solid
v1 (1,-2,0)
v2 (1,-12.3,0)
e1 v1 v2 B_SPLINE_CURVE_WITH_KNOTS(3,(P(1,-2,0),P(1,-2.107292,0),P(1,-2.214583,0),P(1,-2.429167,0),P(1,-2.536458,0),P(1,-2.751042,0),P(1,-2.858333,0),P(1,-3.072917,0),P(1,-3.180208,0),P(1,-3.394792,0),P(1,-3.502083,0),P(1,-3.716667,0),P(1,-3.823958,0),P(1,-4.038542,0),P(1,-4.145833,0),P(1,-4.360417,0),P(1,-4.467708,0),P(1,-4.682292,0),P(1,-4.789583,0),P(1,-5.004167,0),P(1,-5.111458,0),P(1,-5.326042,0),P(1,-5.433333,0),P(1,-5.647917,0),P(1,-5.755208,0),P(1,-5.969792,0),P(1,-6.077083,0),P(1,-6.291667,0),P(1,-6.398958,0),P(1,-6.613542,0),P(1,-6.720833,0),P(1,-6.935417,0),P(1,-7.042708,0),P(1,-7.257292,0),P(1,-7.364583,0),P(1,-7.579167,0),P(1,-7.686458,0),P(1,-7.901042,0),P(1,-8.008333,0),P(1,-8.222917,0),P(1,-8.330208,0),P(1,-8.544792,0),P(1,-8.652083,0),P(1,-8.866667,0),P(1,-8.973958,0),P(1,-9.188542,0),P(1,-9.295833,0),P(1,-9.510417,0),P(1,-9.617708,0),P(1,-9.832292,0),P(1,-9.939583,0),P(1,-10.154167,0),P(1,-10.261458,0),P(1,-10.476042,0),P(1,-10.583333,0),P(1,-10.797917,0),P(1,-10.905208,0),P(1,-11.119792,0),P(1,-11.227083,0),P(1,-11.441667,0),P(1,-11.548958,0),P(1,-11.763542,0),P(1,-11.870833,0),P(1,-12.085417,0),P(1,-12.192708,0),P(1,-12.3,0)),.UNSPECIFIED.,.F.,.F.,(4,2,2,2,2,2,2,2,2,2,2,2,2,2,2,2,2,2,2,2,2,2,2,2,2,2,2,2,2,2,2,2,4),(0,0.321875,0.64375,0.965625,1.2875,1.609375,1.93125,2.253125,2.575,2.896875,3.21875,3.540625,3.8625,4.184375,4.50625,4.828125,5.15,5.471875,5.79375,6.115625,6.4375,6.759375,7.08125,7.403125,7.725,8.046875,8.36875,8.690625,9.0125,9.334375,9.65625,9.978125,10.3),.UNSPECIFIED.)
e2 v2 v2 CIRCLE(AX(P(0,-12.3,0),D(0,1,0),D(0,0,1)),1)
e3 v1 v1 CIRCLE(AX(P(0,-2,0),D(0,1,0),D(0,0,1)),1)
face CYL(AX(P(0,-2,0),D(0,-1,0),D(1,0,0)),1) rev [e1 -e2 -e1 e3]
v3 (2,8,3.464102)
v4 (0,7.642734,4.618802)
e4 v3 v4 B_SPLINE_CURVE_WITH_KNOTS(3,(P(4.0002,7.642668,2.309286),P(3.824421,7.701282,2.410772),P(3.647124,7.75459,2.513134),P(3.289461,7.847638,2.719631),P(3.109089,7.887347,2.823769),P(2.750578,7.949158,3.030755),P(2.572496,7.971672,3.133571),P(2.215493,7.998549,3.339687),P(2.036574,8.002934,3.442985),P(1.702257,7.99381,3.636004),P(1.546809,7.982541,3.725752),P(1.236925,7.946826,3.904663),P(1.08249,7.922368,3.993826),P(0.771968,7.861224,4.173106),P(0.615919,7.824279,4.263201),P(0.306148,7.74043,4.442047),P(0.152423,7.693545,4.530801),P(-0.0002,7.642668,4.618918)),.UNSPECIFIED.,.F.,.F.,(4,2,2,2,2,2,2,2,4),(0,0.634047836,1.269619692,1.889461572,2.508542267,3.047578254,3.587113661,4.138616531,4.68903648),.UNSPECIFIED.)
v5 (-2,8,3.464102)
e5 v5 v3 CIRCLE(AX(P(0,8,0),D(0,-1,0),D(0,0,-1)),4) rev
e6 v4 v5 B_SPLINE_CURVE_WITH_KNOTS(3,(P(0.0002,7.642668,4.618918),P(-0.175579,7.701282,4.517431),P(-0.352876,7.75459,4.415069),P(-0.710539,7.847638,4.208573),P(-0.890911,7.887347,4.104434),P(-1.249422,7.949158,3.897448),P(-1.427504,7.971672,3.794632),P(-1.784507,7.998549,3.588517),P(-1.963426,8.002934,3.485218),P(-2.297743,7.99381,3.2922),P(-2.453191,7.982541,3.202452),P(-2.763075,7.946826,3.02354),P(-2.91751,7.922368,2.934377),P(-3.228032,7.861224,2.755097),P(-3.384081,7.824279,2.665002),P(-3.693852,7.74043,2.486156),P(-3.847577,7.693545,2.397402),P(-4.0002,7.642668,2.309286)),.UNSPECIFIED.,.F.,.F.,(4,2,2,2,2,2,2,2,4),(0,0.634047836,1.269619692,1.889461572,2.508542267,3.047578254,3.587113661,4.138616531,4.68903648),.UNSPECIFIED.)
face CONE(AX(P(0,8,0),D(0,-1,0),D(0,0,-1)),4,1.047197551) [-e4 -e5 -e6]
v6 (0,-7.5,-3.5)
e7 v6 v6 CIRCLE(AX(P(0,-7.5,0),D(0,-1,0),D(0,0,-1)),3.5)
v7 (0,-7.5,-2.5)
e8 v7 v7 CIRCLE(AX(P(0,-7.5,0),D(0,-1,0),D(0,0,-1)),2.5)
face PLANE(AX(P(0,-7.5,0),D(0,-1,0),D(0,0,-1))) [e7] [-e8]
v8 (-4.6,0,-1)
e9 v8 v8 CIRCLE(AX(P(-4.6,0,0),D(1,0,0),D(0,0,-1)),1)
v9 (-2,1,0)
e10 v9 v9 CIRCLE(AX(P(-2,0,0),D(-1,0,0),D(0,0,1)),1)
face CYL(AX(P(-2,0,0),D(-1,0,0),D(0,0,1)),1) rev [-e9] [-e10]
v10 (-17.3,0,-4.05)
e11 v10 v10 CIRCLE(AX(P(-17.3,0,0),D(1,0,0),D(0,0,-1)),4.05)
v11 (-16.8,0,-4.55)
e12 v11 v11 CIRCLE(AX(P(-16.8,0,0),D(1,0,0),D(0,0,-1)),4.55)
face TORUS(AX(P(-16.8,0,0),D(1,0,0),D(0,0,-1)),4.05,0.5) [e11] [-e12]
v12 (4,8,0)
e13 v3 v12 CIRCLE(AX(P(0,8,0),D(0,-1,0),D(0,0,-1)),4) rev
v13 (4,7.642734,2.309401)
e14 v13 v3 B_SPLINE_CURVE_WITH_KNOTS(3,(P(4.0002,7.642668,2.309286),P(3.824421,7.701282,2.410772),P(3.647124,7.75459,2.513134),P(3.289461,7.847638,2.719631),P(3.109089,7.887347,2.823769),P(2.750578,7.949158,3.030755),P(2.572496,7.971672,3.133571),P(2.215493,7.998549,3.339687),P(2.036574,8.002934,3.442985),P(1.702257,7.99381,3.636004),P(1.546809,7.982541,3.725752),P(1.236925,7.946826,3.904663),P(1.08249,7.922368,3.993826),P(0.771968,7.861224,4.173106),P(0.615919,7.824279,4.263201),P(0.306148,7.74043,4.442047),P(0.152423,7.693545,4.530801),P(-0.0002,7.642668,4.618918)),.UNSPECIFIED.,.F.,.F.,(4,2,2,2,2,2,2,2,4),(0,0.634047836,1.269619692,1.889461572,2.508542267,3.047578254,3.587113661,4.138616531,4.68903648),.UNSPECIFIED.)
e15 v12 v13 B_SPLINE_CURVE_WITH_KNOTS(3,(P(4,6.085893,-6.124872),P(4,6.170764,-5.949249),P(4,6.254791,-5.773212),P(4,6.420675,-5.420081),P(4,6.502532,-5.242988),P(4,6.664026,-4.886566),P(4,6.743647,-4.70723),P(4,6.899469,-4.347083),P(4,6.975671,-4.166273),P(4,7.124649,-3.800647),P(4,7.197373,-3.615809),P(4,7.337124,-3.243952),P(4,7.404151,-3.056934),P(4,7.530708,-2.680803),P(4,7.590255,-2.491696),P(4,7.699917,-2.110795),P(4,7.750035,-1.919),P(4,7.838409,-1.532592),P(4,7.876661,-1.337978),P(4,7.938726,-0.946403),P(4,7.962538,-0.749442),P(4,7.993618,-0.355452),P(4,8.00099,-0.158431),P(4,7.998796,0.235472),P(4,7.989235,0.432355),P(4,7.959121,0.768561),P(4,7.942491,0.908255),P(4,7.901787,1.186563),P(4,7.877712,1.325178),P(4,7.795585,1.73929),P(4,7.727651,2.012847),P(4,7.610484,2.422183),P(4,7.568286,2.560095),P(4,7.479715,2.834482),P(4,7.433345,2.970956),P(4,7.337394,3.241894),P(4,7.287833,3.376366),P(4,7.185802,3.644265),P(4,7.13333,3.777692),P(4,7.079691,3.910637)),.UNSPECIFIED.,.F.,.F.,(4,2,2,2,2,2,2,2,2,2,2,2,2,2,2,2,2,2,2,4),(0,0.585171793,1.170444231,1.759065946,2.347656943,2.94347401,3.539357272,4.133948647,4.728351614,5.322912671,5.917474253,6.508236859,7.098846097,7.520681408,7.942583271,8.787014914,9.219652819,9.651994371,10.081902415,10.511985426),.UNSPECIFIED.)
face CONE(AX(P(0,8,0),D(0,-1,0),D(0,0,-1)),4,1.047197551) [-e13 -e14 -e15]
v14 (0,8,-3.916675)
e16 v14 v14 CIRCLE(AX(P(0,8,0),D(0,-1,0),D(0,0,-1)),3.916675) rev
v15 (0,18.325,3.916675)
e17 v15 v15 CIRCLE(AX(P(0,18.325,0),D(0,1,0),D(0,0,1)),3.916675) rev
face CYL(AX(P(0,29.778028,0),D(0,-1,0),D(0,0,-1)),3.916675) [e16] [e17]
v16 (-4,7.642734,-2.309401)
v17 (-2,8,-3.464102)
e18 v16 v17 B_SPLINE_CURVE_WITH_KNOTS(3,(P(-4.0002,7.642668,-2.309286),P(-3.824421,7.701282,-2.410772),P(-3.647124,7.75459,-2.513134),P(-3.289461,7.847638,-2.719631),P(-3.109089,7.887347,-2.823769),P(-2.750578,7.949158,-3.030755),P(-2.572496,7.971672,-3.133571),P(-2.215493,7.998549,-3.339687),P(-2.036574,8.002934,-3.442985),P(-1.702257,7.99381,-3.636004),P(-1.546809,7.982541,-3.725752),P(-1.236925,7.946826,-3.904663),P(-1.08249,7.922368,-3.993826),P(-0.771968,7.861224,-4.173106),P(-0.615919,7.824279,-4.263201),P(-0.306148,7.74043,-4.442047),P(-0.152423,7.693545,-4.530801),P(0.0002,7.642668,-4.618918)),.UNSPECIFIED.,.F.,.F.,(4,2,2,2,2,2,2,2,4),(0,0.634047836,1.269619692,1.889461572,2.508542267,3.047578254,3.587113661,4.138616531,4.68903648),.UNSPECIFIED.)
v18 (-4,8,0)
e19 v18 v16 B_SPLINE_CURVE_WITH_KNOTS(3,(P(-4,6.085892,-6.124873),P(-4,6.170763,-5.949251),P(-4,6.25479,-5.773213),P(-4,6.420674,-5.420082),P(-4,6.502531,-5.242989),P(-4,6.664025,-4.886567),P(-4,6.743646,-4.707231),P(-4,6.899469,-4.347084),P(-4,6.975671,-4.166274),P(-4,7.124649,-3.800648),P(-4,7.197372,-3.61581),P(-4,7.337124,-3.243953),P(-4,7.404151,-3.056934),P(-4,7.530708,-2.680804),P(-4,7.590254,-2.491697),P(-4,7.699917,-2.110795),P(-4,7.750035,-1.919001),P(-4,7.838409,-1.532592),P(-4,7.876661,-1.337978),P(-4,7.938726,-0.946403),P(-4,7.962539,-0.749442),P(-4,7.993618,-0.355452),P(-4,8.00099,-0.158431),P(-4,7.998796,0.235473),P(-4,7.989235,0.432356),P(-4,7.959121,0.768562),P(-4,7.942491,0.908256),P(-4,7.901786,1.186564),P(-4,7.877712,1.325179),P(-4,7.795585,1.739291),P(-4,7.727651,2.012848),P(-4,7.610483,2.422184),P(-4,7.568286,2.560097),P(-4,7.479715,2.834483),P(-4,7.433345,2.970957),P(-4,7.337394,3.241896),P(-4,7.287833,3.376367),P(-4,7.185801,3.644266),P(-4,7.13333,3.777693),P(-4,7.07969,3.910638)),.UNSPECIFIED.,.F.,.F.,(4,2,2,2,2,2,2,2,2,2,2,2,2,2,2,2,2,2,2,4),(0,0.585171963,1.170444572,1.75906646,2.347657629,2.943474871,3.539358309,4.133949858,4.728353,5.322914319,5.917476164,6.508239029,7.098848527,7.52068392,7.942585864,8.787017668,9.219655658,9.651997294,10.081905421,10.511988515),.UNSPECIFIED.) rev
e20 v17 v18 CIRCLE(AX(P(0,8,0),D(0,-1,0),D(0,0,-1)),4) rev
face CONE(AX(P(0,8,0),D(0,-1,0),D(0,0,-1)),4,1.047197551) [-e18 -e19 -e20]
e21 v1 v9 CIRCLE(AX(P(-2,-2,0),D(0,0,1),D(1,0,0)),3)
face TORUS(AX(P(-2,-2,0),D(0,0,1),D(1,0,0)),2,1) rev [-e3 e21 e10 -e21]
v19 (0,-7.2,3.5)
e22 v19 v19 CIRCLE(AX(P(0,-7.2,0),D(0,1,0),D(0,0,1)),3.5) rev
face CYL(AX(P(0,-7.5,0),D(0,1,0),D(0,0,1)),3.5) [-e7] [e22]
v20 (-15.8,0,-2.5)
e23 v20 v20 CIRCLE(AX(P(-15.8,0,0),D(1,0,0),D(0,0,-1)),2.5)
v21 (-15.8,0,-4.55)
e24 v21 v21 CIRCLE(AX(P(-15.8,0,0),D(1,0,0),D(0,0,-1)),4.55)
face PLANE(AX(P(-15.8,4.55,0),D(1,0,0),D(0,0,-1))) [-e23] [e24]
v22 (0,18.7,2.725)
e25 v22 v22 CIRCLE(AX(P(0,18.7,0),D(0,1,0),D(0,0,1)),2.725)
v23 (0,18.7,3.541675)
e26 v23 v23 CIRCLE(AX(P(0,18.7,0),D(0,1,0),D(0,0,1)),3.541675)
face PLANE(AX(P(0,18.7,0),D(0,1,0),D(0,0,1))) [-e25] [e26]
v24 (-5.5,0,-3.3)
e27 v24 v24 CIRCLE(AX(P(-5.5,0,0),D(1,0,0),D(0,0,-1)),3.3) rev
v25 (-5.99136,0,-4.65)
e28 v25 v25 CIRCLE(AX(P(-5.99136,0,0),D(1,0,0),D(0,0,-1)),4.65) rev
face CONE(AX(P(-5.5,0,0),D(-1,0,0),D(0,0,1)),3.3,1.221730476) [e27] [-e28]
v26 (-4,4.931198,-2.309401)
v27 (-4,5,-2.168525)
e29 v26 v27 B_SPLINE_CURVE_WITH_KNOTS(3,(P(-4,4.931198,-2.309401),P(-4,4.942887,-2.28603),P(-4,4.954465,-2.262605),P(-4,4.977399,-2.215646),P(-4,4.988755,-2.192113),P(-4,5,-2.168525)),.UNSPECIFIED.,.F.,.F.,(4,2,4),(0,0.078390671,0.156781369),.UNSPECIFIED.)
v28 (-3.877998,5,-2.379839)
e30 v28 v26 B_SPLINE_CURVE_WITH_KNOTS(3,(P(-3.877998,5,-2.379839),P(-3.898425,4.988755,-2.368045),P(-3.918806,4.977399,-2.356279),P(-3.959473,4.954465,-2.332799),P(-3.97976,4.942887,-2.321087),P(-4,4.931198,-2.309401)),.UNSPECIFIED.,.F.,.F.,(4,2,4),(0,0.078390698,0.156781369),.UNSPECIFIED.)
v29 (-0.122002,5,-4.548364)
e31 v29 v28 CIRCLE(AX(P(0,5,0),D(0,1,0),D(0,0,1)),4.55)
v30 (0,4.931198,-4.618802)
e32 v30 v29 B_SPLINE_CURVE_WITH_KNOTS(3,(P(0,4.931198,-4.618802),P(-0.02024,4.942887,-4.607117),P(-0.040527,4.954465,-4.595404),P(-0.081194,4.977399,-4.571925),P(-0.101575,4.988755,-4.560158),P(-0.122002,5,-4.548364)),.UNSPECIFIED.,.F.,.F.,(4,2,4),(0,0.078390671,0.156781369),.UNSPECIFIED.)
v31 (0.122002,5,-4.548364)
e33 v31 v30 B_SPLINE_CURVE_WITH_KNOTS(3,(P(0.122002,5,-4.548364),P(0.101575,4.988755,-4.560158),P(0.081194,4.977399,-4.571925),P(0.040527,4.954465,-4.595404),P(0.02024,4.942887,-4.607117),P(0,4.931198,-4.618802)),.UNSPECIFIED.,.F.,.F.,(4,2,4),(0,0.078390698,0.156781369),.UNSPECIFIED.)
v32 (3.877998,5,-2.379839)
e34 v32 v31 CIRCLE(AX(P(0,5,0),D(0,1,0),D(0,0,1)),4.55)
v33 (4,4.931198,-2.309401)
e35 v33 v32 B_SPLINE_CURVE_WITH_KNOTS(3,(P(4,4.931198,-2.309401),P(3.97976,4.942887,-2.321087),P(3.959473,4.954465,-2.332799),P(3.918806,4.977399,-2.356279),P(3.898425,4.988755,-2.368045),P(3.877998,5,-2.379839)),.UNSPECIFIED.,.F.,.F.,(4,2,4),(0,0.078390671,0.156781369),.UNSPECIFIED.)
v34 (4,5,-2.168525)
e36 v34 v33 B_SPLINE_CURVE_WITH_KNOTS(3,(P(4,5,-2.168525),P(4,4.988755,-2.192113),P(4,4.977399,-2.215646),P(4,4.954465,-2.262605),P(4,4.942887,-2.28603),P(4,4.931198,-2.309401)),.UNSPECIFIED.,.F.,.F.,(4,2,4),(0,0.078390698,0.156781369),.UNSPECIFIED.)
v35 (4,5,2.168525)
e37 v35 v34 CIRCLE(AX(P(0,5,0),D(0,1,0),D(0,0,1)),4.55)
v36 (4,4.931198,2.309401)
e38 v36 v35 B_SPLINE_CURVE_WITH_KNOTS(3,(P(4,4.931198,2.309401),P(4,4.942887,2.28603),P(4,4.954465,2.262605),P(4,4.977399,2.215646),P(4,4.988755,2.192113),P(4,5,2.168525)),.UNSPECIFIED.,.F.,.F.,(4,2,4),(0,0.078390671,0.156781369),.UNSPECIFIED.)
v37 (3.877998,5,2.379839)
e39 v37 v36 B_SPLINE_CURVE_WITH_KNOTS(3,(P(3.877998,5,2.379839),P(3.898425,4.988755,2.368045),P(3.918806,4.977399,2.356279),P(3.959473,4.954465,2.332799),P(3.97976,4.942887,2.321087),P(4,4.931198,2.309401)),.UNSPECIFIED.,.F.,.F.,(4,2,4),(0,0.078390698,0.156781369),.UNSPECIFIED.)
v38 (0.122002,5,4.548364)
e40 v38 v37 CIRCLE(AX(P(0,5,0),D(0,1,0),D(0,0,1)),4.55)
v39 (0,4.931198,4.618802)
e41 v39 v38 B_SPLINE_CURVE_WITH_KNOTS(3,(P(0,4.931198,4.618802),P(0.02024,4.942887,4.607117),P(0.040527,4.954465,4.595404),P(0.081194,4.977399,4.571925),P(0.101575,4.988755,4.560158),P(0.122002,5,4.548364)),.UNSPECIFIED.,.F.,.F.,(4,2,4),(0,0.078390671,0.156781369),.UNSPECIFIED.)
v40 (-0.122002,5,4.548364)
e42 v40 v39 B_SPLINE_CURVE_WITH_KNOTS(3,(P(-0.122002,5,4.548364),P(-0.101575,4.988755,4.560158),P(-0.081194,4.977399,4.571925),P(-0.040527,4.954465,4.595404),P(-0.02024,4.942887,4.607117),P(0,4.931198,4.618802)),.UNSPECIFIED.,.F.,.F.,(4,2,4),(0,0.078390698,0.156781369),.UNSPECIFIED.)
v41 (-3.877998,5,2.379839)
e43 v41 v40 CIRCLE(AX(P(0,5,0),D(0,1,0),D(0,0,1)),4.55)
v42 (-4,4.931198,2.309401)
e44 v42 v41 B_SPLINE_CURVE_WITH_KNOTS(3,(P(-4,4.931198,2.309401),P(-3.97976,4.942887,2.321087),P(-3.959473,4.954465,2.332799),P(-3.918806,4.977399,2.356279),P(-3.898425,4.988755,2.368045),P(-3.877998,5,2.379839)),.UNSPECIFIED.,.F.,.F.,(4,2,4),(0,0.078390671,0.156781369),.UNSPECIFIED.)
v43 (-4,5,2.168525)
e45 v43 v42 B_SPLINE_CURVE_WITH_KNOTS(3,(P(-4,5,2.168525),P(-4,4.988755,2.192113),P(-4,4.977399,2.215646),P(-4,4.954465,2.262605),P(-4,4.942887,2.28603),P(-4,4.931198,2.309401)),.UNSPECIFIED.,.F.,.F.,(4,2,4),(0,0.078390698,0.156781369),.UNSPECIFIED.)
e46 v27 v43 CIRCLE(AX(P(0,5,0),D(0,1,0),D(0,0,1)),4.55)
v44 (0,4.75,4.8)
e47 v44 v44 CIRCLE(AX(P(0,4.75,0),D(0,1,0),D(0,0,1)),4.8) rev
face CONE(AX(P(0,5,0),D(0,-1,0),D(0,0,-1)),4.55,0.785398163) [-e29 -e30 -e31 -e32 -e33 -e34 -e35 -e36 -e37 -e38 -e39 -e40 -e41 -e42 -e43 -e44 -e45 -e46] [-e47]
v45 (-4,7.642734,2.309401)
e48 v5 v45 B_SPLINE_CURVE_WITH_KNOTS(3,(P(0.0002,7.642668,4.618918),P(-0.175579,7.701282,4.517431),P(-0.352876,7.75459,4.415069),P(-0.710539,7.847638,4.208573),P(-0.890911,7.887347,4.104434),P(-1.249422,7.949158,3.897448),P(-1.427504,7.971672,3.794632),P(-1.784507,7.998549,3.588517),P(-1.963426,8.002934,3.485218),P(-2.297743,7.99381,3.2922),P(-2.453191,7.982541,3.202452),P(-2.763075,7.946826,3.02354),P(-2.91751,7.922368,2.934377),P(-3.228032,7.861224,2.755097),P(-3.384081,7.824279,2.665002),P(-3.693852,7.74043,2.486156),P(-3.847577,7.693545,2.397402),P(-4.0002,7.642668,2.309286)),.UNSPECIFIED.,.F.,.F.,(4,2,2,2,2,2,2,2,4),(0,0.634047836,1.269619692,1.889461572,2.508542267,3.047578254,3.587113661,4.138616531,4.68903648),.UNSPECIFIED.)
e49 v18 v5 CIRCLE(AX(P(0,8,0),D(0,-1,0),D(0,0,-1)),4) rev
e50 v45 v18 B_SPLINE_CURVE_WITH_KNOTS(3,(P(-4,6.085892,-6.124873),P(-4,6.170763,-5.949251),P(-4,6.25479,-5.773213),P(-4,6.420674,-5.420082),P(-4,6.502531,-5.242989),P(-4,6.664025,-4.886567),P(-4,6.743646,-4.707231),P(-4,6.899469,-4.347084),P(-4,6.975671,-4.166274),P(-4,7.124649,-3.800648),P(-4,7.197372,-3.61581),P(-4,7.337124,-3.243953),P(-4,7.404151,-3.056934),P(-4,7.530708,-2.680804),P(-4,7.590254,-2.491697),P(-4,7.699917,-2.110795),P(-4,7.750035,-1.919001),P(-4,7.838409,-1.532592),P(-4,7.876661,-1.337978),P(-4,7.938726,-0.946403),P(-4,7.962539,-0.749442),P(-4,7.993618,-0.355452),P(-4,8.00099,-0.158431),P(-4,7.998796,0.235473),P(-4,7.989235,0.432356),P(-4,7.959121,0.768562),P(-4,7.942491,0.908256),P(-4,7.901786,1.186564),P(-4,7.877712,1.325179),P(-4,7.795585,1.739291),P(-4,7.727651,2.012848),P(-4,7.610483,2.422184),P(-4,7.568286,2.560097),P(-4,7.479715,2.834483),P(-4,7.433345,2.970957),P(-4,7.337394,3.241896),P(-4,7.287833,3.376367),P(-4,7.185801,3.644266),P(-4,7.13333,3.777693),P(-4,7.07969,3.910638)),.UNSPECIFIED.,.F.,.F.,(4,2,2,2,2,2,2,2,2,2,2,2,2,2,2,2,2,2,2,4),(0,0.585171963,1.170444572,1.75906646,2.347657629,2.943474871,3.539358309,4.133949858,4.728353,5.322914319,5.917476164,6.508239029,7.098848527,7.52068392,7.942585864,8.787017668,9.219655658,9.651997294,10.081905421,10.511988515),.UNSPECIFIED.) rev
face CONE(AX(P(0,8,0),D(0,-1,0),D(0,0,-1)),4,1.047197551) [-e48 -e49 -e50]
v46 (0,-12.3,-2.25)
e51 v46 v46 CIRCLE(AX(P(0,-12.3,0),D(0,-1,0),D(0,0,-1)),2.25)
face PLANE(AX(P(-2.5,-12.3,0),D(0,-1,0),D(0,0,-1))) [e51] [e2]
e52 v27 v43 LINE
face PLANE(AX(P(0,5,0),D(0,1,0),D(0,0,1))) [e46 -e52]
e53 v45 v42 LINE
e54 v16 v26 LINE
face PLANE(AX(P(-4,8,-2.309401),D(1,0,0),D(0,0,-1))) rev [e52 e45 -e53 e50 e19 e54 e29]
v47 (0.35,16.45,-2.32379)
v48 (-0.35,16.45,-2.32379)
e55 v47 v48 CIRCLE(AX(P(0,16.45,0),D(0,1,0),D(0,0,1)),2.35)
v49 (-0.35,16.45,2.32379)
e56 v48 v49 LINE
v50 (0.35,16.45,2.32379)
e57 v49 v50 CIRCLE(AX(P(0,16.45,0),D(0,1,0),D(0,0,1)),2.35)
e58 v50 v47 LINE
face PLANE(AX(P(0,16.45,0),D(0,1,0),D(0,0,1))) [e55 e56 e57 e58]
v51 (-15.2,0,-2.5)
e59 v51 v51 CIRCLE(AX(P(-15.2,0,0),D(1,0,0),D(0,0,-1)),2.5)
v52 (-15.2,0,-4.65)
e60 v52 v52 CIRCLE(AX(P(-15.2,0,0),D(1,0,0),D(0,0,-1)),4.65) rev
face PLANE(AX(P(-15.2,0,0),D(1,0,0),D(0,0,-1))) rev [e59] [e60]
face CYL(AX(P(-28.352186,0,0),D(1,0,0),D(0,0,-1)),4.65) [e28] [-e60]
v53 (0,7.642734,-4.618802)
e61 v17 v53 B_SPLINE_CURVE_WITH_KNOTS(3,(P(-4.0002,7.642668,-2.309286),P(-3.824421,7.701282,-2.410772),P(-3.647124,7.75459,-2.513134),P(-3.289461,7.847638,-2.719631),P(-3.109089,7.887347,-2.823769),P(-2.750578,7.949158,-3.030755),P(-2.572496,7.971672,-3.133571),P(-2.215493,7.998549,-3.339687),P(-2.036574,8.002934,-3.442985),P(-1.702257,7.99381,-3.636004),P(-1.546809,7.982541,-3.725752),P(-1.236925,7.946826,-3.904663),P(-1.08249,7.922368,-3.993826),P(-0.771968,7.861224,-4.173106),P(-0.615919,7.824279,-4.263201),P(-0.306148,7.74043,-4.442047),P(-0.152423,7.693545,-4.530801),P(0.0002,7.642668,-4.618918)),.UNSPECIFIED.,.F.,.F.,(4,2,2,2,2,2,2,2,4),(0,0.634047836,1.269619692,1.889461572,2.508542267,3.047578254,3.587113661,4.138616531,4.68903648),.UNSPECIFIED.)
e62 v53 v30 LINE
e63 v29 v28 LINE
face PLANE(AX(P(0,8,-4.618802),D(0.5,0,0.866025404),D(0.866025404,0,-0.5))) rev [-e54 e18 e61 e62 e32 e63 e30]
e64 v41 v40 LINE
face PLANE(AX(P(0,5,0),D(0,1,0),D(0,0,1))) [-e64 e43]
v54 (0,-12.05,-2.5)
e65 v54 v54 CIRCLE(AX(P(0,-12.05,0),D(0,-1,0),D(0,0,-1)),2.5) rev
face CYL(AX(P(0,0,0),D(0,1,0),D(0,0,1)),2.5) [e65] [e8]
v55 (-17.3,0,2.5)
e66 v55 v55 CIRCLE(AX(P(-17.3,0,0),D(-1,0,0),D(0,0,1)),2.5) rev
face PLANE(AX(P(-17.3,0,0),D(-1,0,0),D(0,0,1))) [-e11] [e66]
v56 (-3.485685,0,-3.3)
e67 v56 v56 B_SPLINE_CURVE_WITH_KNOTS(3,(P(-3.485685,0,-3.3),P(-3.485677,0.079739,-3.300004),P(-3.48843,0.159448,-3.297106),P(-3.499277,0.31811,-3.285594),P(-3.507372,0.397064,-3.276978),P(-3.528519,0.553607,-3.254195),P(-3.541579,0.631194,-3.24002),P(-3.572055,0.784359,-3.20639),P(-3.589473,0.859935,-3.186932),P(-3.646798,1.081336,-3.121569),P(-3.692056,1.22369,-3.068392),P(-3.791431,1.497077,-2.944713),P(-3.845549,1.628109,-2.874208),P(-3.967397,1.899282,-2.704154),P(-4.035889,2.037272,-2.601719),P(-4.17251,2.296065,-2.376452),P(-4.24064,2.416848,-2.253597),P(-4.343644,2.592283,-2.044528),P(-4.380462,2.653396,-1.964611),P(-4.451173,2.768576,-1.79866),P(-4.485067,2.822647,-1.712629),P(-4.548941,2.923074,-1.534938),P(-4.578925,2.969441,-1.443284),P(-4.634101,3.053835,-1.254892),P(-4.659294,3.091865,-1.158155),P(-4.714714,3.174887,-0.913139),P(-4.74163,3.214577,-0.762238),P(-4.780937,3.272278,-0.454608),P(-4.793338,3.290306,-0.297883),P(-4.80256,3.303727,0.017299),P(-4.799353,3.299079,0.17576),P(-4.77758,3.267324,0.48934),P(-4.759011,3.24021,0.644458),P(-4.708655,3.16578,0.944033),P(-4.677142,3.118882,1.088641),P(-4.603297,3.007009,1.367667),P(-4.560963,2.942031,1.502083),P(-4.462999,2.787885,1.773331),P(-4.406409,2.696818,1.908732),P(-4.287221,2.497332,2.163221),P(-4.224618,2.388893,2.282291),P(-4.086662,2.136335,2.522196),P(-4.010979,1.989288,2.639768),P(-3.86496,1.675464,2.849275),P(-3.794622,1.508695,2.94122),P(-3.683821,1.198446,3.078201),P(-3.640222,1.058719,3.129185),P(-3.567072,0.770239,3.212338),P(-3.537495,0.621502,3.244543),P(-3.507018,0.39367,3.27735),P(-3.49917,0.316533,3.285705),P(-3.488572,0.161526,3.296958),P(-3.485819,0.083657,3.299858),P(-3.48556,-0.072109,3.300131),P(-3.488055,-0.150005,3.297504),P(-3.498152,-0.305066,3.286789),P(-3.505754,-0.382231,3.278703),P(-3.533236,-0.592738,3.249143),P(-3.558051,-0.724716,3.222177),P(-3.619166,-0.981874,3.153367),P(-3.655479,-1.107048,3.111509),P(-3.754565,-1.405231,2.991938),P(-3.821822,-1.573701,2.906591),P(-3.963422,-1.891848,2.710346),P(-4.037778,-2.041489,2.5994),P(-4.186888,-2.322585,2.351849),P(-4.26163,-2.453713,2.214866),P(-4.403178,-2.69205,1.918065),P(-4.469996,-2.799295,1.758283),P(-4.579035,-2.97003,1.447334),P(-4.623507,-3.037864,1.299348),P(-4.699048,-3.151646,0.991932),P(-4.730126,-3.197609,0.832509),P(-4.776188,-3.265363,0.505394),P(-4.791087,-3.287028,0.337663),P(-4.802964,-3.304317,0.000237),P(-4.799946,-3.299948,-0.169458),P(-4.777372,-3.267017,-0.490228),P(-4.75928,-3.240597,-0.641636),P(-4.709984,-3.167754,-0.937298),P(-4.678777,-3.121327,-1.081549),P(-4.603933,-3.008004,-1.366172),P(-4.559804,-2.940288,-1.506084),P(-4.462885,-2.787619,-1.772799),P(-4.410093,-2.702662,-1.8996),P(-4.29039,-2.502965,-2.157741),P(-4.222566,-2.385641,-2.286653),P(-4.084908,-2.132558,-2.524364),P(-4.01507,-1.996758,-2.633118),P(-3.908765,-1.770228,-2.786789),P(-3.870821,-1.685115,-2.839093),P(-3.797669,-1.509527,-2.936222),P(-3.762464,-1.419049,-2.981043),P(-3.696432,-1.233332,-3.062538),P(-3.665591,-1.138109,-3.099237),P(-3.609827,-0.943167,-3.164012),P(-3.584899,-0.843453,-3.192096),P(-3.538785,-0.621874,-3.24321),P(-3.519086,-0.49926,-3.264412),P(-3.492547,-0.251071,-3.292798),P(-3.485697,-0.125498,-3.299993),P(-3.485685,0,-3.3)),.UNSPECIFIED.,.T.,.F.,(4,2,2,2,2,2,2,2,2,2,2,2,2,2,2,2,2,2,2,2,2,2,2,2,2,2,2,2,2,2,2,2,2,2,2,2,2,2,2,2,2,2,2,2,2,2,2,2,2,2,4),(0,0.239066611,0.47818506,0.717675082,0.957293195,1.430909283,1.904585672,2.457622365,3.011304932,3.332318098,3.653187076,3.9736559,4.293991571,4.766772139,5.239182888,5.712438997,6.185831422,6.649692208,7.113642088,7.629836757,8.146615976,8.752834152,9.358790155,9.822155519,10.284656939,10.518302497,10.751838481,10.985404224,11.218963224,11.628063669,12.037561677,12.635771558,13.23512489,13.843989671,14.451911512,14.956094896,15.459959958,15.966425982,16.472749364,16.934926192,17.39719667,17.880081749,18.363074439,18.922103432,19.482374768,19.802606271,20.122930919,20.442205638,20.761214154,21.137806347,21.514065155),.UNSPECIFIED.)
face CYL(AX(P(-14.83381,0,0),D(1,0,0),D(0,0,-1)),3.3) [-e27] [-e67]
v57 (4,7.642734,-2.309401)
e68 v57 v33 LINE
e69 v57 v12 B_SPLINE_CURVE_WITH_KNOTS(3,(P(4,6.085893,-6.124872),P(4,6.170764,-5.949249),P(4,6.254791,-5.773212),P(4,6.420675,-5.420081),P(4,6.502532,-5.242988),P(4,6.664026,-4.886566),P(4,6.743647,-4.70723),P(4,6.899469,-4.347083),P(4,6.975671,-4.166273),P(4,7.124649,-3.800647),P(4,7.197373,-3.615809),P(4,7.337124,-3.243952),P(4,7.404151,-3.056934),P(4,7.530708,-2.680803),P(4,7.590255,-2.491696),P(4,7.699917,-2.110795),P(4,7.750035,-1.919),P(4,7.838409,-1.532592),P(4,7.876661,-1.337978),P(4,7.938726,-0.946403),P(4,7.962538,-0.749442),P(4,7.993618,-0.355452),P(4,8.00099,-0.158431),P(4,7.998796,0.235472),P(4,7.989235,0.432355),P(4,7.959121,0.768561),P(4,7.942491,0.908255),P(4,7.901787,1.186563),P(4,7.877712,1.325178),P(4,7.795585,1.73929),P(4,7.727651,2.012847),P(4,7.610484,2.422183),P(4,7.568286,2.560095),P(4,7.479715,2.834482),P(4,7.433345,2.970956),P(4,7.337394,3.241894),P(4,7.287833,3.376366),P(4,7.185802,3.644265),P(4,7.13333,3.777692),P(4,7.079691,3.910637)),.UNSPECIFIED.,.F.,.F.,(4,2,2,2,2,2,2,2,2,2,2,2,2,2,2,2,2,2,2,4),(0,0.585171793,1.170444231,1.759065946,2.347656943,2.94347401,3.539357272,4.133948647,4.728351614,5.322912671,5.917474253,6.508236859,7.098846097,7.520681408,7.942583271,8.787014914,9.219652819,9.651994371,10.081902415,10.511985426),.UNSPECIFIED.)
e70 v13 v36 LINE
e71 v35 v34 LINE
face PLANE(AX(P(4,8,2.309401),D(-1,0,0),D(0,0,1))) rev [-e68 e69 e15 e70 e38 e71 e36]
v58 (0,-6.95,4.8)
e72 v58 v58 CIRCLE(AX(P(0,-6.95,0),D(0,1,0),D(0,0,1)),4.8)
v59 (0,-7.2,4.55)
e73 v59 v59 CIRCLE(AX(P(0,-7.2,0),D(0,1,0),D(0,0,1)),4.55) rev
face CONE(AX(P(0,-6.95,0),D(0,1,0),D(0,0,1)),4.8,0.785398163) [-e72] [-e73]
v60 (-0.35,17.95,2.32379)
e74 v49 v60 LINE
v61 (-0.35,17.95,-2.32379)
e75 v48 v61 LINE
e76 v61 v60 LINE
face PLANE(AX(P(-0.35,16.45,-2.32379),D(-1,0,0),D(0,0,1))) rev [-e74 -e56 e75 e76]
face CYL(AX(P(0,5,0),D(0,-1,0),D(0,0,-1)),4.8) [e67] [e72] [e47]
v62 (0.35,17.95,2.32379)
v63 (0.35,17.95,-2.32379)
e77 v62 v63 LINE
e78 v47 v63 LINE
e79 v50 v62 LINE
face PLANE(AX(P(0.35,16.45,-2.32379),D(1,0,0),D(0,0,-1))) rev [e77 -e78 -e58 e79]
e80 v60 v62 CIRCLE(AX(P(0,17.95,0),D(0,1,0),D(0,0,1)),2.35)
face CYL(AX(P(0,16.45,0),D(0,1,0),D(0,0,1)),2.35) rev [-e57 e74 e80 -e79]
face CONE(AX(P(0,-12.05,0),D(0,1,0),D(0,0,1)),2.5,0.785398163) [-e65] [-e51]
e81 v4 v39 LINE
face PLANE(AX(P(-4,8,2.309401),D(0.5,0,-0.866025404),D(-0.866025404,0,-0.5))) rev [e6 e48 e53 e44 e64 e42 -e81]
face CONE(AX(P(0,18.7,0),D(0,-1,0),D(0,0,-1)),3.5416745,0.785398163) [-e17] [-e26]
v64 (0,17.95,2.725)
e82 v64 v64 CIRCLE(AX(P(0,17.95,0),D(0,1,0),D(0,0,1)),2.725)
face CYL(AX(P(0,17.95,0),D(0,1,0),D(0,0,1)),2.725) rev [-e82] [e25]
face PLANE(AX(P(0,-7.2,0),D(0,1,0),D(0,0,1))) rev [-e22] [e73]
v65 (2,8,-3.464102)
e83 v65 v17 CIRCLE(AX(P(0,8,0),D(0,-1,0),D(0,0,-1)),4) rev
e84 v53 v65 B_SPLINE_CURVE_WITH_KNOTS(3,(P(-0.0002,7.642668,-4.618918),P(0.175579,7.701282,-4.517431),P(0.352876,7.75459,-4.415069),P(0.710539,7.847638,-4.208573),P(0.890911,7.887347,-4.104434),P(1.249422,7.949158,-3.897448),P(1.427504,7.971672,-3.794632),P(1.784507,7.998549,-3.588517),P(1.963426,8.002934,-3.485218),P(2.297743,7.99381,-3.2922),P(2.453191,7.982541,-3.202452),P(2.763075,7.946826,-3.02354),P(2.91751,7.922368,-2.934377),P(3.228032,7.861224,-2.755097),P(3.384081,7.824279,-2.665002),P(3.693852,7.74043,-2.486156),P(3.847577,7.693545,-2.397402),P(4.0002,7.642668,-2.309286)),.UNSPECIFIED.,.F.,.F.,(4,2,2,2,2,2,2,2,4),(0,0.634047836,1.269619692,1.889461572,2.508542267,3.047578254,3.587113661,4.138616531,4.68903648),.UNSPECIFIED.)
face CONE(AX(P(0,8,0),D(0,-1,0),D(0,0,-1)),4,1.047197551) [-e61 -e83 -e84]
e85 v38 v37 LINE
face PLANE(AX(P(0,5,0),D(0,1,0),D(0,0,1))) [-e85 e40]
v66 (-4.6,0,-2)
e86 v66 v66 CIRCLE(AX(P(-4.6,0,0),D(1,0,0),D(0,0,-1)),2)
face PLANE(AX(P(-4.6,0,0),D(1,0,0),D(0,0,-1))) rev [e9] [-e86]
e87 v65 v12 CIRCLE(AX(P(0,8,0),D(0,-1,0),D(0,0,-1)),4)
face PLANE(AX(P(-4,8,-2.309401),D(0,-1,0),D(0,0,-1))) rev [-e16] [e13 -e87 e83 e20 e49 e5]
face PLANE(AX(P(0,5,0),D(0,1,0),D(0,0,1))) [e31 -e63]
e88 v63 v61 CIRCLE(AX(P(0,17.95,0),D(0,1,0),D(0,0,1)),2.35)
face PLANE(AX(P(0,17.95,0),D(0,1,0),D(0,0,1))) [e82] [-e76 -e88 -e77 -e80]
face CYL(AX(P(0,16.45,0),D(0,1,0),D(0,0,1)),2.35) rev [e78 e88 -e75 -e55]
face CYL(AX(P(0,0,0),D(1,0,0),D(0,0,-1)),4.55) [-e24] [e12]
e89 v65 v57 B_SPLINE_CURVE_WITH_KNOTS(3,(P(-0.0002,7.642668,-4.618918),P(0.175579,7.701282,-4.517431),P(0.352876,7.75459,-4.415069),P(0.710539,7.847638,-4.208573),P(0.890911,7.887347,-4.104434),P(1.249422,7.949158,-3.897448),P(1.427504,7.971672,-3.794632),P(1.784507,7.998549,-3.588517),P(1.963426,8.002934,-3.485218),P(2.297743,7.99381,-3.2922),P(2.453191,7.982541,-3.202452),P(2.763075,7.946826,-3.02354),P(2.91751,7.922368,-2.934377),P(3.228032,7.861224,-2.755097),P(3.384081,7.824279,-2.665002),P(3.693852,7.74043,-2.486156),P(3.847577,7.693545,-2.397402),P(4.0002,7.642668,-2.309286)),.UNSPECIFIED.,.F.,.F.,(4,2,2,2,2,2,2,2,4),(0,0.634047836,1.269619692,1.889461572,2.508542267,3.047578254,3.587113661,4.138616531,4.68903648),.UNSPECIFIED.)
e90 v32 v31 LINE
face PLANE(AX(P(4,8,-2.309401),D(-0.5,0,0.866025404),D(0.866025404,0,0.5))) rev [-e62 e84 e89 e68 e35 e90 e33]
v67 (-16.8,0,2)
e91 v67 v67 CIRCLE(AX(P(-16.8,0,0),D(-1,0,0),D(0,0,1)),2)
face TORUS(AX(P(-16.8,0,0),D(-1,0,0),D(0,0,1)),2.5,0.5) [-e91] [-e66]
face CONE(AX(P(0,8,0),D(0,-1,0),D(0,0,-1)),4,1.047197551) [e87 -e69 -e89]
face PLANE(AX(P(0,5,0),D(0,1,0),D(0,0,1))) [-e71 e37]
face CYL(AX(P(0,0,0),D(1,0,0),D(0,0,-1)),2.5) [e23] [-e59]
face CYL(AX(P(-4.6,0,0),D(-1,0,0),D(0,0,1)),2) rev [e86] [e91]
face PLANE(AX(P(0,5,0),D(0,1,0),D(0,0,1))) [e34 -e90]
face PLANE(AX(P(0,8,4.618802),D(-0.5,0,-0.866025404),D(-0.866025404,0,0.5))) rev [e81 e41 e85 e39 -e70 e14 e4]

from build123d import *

# Parameters (mm, degrees)
BASE_BODY_DEPTH         = 5
BASE_BODY_DEPTH_BACK    = 7.2
BASE_BODY_SKETCH_R      = 4.8
RBODY_SML_SKETCH_R      = 3.3
RBODY_SML_DEPTH         = 5.5
HEX_2_DEPTH             = 3
THREAD_OFFSET_START     = -7.5
THREAD_OFFSET_SKETCH_R  = 3.5
THREAD_OFFSET_DEPTH     = 0.3
THREAD_SKETCH_W         = 2.5
THREAD_SKETCH_H         = 5.1
CHAMFER_2_SIZE          = 0.25
RBODY_SKETCH_R          = 4.65
RBODY_DEPTH             = 9.7
TUBE_SKETCH_R           = 2
TUBE_DEPTH              = 12.7
TUBE_RADIUS_R           = 0.5
DIAMETER_R              = 1
BODY_CHAMFER_SIZE       = 0.25
TAMPER_BODY_SKETCH_R    = 3.9166745
TAMPER_BODY_DEPTH       = 10.7
TAMPER_BODY_CHAM_SIZE   = 0.375
TAMPER_CONTROL_SKETCH_R = 2.725
TAMPER_CONTROL_DEPTH    = 0.75
TAMPER_FLAT_DEPTH       = 1.5


with BuildPart() as part:
    # Base-Body_Sketch → Base-Body (new, two sides: drawn at the far end of the back side and taken through both)
    with BuildSketch(Plane(origin=(0, 0, 0), x_dir=(1, 0, 0), z_dir=(0, 1, 0)).offset(-BASE_BODY_DEPTH_BACK)):
        with Locations(Location((0, 0, 0), (0, 0, 270))):
            Circle(BASE_BODY_SKETCH_R)
    extrude(amount=BASE_BODY_DEPTH + BASE_BODY_DEPTH_BACK)

    # RBody_sml_Sketch → RBody_sml (add)
    with BuildSketch(Plane(origin=(0, 0, 0), x_dir=(0, 0, -1), z_dir=(1, 0, 0))):
        Circle(RBODY_SML_SKETCH_R)
    extrude(amount=-RBODY_SML_DEPTH)

    # Hex_Sketch → Hex 2 (add)
    with BuildSketch(Plane(origin=(0, 5, 0), x_dir=(-1, 0, 0), z_dir=(0, 1, 0))):
        Polygon((4, 2.309401077), (0, 4.618802154), (-4, 2.309401077), (-4, -2.309401077), (0, -4.618802154), (4, -2.309401077), align=None)
    extrude(amount=HEX_2_DEPTH)

    # Hex_Chamfer_Sketch → Hex_Chamfer (revolve, cut)
    with BuildSketch(Plane(origin=(0, 0, 0), x_dir=(0, 0, -1), z_dir=(1, 0, 0))):
        Polygon((4, 8), (4.618802154, 8), (4.618802154, 7.64273441), align=None)
    revolve(axis=Axis((0, 0, 0), (0, 1, 0)), mode=Mode.SUBTRACT)

    # Thread_Offset_Sketch (on Top Plane) → Thread_Offset (add)
    with BuildSketch(Plane(origin=(0, 0, 0), x_dir=(1, 0, 0), z_dir=(0, 1, 0)).offset(THREAD_OFFSET_START)):
        with Locations(Location((0, 0, 0), (0, 0, 270))):
            Circle(THREAD_OFFSET_SKETCH_R)
    extrude(amount=THREAD_OFFSET_DEPTH)

    # Thread_Sketch → Thread (revolve)
    with BuildSketch(Plane.XY, mode=Mode.PRIVATE) as thread_sk:
        with Locations((-1.25, -9.75)):
            Rectangle(THREAD_SKETCH_W, THREAD_SKETCH_H)
    revolve(thread_sk.sketch.rotate(Axis((0, 0, 0), (0, -1, 0)), 270), axis=Axis((0, 0, 0), (0, -1, 0)))

    # Chamfer 2: size read off the stored shape
    # Chamfer 2
    chamfer_2_edges = [part.edges().sort_by_distance(p)[0] for p in [
        (0, -12.3, -2.5),
    ]]
    chamfer(chamfer_2_edges, length=CHAMFER_2_SIZE)

    # RBody_Sketch → RBody (add)
    with BuildSketch(Plane(origin=(-5.5, 0, 0), x_dir=(0, 0, -1), z_dir=(1, 0, 0))):
        Circle(RBODY_SKETCH_R)
    extrude(amount=-RBODY_DEPTH)

    # Release_Sketch → Release (revolve)
    with BuildSketch(Plane.XY, mode=Mode.PRIVATE) as release_sk:
        with BuildLine():
            Line((-17.3, 0), (-17.3, 4.05))
            ThreePointArc((-17.3, 4.05), (-17.153553391, 4.403553391), (-16.8, 4.55))
            Line((-16.8, 4.55), (-15.8, 4.55))
            Line((-15.8, 4.55), (-15.8, 2.5))
            Line((-15.8, 2.5), (-15.2, 2.5))
            Line((-15.2, 2.5), (-15.2, 0))
            Line((-15.2, 0), (-17.3, 0))
        make_face()
    revolve(release_sk.sketch.rotate(Axis((0, 0, 0), (-1, 0, 0)), 90), axis=Axis((0, 0, 0), (-1, 0, 0)))

    # Tube_Sketch → Tube (cut)
    with BuildSketch(Plane(origin=(-17.3, 0, 0), x_dir=(0, 0, -1), z_dir=(1, 0, 0))):
        Circle(TUBE_SKETCH_R)
    extrude(amount=TUBE_DEPTH, mode=Mode.SUBTRACT)

    # Tube_Radius
    tube_radius_edges = [part.edges().sort_by_distance(p)[0] for p in [
        (-17.3, 0, 2),
    ]]
    fillet(tube_radius_edges, radius=TUBE_RADIUS_R)

    # RBody_Chamfer: read off the stored shape, not the designer's step
    # RBody_Chamfer outline → RBody_Chamfer (revolve, cut)
    with BuildSketch(Plane.YX):
        Polygon((4.65, -5.5), (3.3, -5.5), (4.65, -5.991359816), align=None)
    revolve(axis=Axis((0, 0, 0), (1, 0, 0)), mode=Mode.SUBTRACT)

    # Port: sweep along a path in Profile
    with BuildLine(Plane.XY) as port_path:
        Line((-17.3, 0), (-2, 0))
        ThreePointArc((-2, 0), (-0.585786438, -0.585786438), (0, -2))
        Line((0, -2), (0, -12.3))
    # Diameter → Port (sweep, cut)
    with BuildSketch(Plane(origin=(0, -12.3, 0), x_dir=(-1, 0, 0), z_dir=(0, 1, 0))):
        Circle(DIAMETER_R)
    sweep(path=port_path.line, mode=Mode.SUBTRACT)

    # Body_Chamfer
    # the kernel refuses this chamfer: 0.25 mm, written as the material it takes off along each edge
    with BuildSketch(Plane(origin=(0, -7.2, 0), x_dir=(0, 0, 1), z_dir=(-1, 0, 0))) as body_chamfer_piece_1:
        Polygon((4.8, BODY_CHAMFER_SIZE), (4.8 - BODY_CHAMFER_SIZE, 0), (4.8, 0), align=None)
    revolve(axis=Axis((0, -7.2, 0), (0, 1, 0)), mode=Mode.SUBTRACT)
    with BuildSketch(Plane(origin=(0, 5, 0), x_dir=(0, 0, 1), z_dir=(-1, 0, 0))) as body_chamfer_piece_2_section:
        Polygon((4.8, -BODY_CHAMFER_SIZE), (4.8 - BODY_CHAMFER_SIZE, 0), (4.8, 0), align=None)
    body_chamfer_piece_2 = revolve(axis=Axis((0, 5, 0), (0, 1, 0)), mode=Mode.PRIVATE)
    body_chamfer_piece_2 = split(body_chamfer_piece_2, bisect_by=Plane(origin=(2, 5, 3.464101615), z_dir=(0.5000000000000002, 0, 0.8660254037844385)), keep=Keep.TOP, mode=Mode.PRIVATE)
    add(body_chamfer_piece_2, mode=Mode.SUBTRACT)
    with BuildSketch(Plane(origin=(0, 5, 0), x_dir=(0, 0, 1), z_dir=(-1, 0, 0))) as body_chamfer_piece_3_section:
        Polygon((4.8, -BODY_CHAMFER_SIZE), (4.8 - BODY_CHAMFER_SIZE, 0), (4.8, 0), align=None)
    body_chamfer_piece_3 = revolve(axis=Axis((0, 5, 0), (0, 1, 0)), mode=Mode.PRIVATE)
    body_chamfer_piece_3 = split(body_chamfer_piece_3, bisect_by=Plane(origin=(-2, 5, 3.464101615), z_dir=(-0.49999999999999983, 0, 0.8660254037844388)), keep=Keep.TOP, mode=Mode.PRIVATE)
    add(body_chamfer_piece_3, mode=Mode.SUBTRACT)
    with BuildSketch(Plane(origin=(0, 5, 0), x_dir=(0, 0, 1), z_dir=(-1, 0, 0))) as body_chamfer_piece_4_section:
        Polygon((4.8, -BODY_CHAMFER_SIZE), (4.8 - BODY_CHAMFER_SIZE, 0), (4.8, 0), align=None)
    body_chamfer_piece_4 = revolve(axis=Axis((0, 5, 0), (0, 1, 0)), mode=Mode.PRIVATE)
    body_chamfer_piece_4 = split(body_chamfer_piece_4, bisect_by=Plane(origin=(4, 5, 0), z_dir=(1, 0, 0)), keep=Keep.TOP, mode=Mode.PRIVATE)
    add(body_chamfer_piece_4, mode=Mode.SUBTRACT)
    with BuildSketch(Plane(origin=(0, 5, 0), x_dir=(0, 0, 1), z_dir=(-1, 0, 0))) as body_chamfer_piece_5_section:
        Polygon((4.8, -BODY_CHAMFER_SIZE), (4.8 - BODY_CHAMFER_SIZE, 0), (4.8, 0), align=None)
    body_chamfer_piece_5 = revolve(axis=Axis((0, 5, 0), (0, 1, 0)), mode=Mode.PRIVATE)
    body_chamfer_piece_5 = split(body_chamfer_piece_5, bisect_by=Plane(origin=(-4, 5, 0), z_dir=(-1, 0, 0)), keep=Keep.TOP, mode=Mode.PRIVATE)
    add(body_chamfer_piece_5, mode=Mode.SUBTRACT)
    with BuildSketch(Plane(origin=(0, 5, 0), x_dir=(0, 0, 1), z_dir=(-1, 0, 0))) as body_chamfer_piece_6_section:
        Polygon((4.8, -BODY_CHAMFER_SIZE), (4.8 - BODY_CHAMFER_SIZE, 0), (4.8, 0), align=None)
    body_chamfer_piece_6 = revolve(axis=Axis((0, 5, 0), (0, 1, 0)), mode=Mode.PRIVATE)
    body_chamfer_piece_6 = split(body_chamfer_piece_6, bisect_by=Plane(origin=(2, 5, -3.464101615), z_dir=(0.4999999999999999, 0, -0.8660254037844388)), keep=Keep.TOP, mode=Mode.PRIVATE)
    add(body_chamfer_piece_6, mode=Mode.SUBTRACT)
    with BuildSketch(Plane(origin=(0, 5, 0), x_dir=(0, 0, 1), z_dir=(-1, 0, 0))) as body_chamfer_piece_7_section:
        Polygon((4.8, -BODY_CHAMFER_SIZE), (4.8 - BODY_CHAMFER_SIZE, 0), (4.8, 0), align=None)
    body_chamfer_piece_7 = revolve(axis=Axis((0, 5, 0), (0, 1, 0)), mode=Mode.PRIVATE)
    body_chamfer_piece_7 = split(body_chamfer_piece_7, bisect_by=Plane(origin=(-2, 5, -3.464101615), z_dir=(-0.5, 0, -0.8660254037844387)), keep=Keep.TOP, mode=Mode.PRIVATE)
    add(body_chamfer_piece_7, mode=Mode.SUBTRACT)

    # Tamper Body_Sketch → Tamper Body (add)
    with BuildSketch(Plane(origin=(0, 8, 0), x_dir=(-1, 0, 0), z_dir=(0, 1, 0))):
        with Locations(Location((0, 0, 0), (0, 0, 270))):
            Circle(TAMPER_BODY_SKETCH_R)
    extrude(amount=TAMPER_BODY_DEPTH)

    # Tamper Body Cham
    tamper_body_cham_edges = [part.edges().sort_by_distance(p)[0] for p in [
        (0, 18.7, 3.9166745),
    ]]
    chamfer(tamper_body_cham_edges, length=TAMPER_BODY_CHAM_SIZE)

    # Tamper Control_Sketch → Tamper Control (cut)
    with BuildSketch(Plane(origin=(0, 18.7, 0), x_dir=(-1, 0, 0), z_dir=(0, 1, 0))):
        with Locations(Location((0, 0, 0), (0, 0, 90))):
            Circle(TAMPER_CONTROL_SKETCH_R)
    extrude(amount=-TAMPER_CONTROL_DEPTH, mode=Mode.SUBTRACT)

    # Tamper Flat_Sketch → Tamper Flat (cut)
    with BuildSketch(Plane(origin=(0, 17.95, 0), x_dir=(-1, 0, 0), z_dir=(0, 1, 0))):
        with BuildLine():
            Line((0.35, -2.323790008), (0.35, 2.323790008))
            ThreePointArc((0.35, 2.323790008), (0, 2.35), (-0.35, 2.323790008))
            Line((-0.35, 2.323790008), (-0.35, -2.323790008))
            ThreePointArc((-0.35, -2.323790008), (0, -2.35), (0.35, -2.323790008))
        make_face()
    extrude(amount=-TAMPER_FLAT_DEPTH, mode=Mode.SUBTRACT)


solid = part.part
